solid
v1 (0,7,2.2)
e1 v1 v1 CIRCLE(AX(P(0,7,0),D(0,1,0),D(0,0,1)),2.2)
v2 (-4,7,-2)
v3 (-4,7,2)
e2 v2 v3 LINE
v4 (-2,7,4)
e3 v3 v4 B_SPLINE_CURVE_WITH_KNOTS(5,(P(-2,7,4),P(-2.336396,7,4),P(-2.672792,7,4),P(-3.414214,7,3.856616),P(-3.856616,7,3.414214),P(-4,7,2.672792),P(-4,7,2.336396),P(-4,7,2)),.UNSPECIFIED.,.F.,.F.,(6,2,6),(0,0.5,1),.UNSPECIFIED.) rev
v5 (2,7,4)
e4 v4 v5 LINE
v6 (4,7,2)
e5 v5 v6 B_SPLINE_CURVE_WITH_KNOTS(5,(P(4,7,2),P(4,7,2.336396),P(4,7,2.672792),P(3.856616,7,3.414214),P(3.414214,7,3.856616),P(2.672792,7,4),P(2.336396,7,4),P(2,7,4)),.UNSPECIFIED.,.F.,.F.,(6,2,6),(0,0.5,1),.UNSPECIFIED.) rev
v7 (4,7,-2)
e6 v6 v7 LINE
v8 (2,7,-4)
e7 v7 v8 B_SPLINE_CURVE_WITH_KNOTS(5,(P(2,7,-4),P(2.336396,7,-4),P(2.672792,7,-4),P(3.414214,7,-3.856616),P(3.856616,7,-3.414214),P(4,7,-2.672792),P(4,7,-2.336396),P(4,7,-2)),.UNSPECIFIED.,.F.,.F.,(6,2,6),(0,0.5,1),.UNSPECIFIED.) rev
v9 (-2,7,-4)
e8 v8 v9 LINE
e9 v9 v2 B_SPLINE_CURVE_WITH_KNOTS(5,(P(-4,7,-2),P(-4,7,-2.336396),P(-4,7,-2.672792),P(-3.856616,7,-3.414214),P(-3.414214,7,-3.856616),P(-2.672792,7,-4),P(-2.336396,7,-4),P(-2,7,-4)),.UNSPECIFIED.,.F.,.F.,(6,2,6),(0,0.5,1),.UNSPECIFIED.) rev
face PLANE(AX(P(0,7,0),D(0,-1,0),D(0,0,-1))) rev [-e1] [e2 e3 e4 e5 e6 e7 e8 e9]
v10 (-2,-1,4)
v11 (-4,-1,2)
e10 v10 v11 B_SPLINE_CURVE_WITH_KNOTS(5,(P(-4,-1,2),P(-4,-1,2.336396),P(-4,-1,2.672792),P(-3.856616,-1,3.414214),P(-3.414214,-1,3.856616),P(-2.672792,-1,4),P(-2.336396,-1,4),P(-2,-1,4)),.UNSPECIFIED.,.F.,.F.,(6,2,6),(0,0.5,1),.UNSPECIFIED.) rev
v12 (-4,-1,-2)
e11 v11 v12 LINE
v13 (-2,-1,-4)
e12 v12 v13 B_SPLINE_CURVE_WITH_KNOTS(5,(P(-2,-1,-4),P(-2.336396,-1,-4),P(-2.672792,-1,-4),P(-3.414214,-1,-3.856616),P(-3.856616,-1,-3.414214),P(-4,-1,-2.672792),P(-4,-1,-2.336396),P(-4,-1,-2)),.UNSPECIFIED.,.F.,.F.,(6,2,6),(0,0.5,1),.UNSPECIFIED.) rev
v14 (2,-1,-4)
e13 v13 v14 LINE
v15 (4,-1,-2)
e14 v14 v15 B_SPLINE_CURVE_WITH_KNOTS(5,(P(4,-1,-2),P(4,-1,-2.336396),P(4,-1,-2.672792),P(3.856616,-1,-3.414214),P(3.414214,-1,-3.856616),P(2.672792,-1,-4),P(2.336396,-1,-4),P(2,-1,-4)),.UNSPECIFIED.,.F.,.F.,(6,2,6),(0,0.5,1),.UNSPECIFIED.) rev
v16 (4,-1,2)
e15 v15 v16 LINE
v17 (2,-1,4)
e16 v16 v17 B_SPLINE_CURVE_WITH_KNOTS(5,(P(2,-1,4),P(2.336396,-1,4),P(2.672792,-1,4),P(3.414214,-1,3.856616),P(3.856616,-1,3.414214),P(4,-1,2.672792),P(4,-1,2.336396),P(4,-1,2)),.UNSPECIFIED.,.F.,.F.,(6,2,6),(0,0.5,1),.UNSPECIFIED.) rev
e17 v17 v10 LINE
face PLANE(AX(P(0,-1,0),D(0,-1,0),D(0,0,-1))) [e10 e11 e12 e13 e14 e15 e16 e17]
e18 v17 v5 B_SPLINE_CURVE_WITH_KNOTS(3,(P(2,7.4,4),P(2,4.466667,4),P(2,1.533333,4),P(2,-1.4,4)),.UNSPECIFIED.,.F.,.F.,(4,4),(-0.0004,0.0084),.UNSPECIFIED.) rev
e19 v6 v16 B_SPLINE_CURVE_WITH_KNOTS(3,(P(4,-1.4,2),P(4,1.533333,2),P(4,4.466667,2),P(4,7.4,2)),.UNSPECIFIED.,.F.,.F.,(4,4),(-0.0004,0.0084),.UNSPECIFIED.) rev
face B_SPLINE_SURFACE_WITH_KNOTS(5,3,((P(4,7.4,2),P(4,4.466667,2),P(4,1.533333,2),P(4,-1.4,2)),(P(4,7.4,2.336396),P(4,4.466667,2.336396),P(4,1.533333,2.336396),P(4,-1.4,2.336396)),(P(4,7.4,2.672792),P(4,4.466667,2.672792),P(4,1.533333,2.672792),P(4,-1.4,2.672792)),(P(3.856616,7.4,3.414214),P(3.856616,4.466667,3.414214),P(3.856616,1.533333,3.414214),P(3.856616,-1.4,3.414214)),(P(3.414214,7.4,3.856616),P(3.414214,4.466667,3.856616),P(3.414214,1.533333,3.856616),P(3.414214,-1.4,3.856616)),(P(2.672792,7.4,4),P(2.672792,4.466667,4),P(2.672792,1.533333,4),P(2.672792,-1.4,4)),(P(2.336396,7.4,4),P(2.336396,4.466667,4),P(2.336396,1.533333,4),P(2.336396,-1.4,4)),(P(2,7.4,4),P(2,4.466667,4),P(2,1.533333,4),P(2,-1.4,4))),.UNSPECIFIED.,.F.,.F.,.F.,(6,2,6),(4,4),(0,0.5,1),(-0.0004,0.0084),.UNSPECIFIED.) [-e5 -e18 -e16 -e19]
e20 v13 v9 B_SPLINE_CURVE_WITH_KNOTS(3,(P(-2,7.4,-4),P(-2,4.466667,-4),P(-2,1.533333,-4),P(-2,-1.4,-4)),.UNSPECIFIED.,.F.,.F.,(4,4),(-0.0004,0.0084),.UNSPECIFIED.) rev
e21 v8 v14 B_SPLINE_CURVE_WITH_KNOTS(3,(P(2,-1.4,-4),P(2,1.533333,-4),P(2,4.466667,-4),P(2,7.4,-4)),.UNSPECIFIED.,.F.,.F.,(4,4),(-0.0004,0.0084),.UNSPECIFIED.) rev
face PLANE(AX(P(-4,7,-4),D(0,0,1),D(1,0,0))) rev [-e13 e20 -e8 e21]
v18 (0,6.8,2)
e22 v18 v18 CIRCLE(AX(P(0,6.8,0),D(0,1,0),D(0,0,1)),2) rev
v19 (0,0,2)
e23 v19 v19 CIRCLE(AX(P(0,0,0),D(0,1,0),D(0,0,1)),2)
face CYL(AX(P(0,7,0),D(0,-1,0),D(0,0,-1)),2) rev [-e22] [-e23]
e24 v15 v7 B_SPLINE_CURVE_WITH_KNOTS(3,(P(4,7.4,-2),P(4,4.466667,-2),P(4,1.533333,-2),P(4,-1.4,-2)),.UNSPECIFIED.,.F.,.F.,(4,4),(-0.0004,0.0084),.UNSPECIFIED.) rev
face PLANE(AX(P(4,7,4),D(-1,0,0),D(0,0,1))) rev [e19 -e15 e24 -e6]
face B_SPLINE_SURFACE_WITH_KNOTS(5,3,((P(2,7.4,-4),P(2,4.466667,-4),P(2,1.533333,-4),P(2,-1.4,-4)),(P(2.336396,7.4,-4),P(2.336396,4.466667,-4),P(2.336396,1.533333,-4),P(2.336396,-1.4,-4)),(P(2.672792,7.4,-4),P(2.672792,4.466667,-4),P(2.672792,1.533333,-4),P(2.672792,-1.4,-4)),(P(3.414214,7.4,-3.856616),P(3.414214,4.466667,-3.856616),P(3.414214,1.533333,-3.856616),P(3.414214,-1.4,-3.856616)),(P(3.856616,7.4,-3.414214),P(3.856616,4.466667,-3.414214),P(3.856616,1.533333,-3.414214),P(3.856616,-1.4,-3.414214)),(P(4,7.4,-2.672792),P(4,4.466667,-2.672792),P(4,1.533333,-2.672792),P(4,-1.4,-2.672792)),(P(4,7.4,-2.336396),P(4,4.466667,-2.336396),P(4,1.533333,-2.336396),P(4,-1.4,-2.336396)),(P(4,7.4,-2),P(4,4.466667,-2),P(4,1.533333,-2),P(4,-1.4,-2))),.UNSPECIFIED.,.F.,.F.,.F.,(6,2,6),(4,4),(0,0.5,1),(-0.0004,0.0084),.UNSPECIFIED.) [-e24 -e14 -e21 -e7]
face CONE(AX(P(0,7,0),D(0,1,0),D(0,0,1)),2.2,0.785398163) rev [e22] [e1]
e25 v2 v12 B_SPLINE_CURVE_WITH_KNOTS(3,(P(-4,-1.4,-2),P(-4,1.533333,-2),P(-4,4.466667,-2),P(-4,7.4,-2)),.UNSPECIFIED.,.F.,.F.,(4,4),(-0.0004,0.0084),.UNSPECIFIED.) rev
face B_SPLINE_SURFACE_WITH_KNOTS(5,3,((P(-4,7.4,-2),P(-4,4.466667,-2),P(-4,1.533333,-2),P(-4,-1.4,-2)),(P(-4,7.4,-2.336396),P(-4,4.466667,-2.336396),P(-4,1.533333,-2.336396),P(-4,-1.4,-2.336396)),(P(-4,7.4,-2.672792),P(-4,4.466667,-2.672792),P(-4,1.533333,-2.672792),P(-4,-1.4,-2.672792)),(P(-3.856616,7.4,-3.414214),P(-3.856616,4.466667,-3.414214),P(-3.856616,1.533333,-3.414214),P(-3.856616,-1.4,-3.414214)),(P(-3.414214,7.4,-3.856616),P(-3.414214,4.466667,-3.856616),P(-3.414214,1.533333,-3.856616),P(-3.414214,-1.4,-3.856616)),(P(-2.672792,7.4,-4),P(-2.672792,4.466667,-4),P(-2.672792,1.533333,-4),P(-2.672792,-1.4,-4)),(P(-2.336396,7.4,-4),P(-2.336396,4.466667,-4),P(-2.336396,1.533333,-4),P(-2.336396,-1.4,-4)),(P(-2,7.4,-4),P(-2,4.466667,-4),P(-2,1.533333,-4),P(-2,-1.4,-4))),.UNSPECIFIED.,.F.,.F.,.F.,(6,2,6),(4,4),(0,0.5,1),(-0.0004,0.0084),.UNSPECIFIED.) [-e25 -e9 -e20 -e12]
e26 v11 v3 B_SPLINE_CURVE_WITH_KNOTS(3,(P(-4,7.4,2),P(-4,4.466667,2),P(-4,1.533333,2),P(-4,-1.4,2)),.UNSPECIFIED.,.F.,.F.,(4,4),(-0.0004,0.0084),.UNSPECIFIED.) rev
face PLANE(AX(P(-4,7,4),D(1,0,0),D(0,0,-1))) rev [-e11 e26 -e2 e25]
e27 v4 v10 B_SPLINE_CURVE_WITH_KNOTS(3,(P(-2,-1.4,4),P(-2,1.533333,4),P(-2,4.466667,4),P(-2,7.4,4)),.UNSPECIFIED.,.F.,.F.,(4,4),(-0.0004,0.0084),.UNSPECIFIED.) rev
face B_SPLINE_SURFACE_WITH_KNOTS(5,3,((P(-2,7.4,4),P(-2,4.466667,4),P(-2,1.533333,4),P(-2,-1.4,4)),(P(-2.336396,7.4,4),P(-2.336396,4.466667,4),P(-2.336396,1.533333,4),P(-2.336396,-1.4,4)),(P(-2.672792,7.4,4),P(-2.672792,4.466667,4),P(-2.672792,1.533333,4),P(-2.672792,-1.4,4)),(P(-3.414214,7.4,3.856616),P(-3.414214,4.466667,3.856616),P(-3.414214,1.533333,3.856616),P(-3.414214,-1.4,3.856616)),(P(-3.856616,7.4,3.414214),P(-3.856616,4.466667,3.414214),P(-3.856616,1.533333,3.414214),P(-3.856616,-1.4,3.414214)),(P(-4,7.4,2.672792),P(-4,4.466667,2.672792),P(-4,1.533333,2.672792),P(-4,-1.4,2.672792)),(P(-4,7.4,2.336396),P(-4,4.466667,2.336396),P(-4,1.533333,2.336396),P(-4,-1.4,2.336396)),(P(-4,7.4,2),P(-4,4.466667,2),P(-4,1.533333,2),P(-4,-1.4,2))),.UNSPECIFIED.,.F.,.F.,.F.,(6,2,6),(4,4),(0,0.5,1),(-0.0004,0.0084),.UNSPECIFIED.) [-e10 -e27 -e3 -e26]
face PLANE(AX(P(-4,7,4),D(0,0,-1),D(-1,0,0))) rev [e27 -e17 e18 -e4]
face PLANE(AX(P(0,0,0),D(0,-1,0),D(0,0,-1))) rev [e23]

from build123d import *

# Parameters (mm, degrees)
SKETCH2_W                                       = 8
SKETCH2_H                                       = 8
SKETCH2_R                                       = 2
BOSS_EXTRUDE1_DEPTH                             = 7
SKETCH3_W                                       = 8
SKETCH3_H                                       = 8
BOSS_EXTRUDE2_DEPTH                             = 1
FILLET1_SIZE                                    = 2
CSK_FOR_M2_FLAT_HEAD_MACHINE_SCREW1_D           = 2.4
CSK_FOR_M2_FLAT_HEAD_MACHINE_SCREW1_DEPTH       = 7
CSK_FOR_M2_FLAT_HEAD_MACHINE_SCREW1_CSINK_D     = 4.4
CSK_FOR_M2_FLAT_HEAD_MACHINE_SCREW1_CSINK_ANGLE = 90


with BuildPart() as part:
    # Sketch2 → Boss-Extrude1 (new body)
    with BuildSketch(Plane(origin=(0, 0, 0), x_dir=(1, 0, 0), z_dir=(0, 1, 0))):
        Rectangle(SKETCH2_W, SKETCH2_H)
        with Locations(Location((0, 0, 0), (0, 0, 270))):
            Circle(SKETCH2_R, mode=Mode.SUBTRACT)
    extrude(amount=BOSS_EXTRUDE1_DEPTH)

    # Sketch3 → Boss-Extrude2 (add)
    with BuildSketch(Plane.XZ):
        Rectangle(SKETCH3_W, SKETCH3_H)
    extrude(amount=BOSS_EXTRUDE2_DEPTH)

    # Fillet1
    # a fillet whose section is not a circle: 2 mm, written as the material it takes off along each edge
    with BuildSketch(Plane(origin=(4, -6, 4), x_dir=(-1, 0, 0), z_dir=(0, 1, 0)), Plane(origin=(-4, 12, 4), x_dir=(1, 0, 0), z_dir=(0, -1, 0))) as fillet1_piece_1:
        with BuildLine():
            add(Edge.make_bspline([(FILLET1_SIZE, 0), (FILLET1_SIZE * 0.831801948466, 0), (FILLET1_SIZE * 0.663603896932, 0), (FILLET1_SIZE * 0.292893218813, -FILLET1_SIZE * 0.0716919198361), (FILLET1_SIZE * 0.0716919198361, -FILLET1_SIZE * 0.292893218813), (0, -FILLET1_SIZE * 0.663603896932), (0, -FILLET1_SIZE * 0.831801948466), (0, -FILLET1_SIZE)], knots=[0, 0, 0, 0, 0, 0, 0.5, 0.5, 1, 1, 1, 1, 1, 1], degree=5))
            Line((0, -FILLET1_SIZE), (0, 0))
            Line((0, 0), (FILLET1_SIZE, 0))
        make_face()
    extrude(amount=18, mode=Mode.SUBTRACT)
    with BuildSketch(Plane(origin=(-4, 12, -4), x_dir=(1, 0, 0), z_dir=(0, -1, 0)), Plane(origin=(4, -6, -4), x_dir=(-1, 0, 0), z_dir=(0, 1, 0))) as fillet1_piece_2:
        with BuildLine():
            add(Edge.make_bspline([(FILLET1_SIZE, 0), (FILLET1_SIZE * 0.831801948466, 0), (FILLET1_SIZE * 0.663603896932, 0), (FILLET1_SIZE * 0.292893218813, FILLET1_SIZE * 0.0716919198361), (FILLET1_SIZE * 0.0716919198361, FILLET1_SIZE * 0.292893218813), (0, FILLET1_SIZE * 0.663603896932), (0, FILLET1_SIZE * 0.831801948466), (0, FILLET1_SIZE)], knots=[0, 0, 0, 0, 0, 0, 0.5, 0.5, 1, 1, 1, 1, 1, 1], degree=5))
            Line((0, FILLET1_SIZE), (0, 0))
            Line((0, 0), (FILLET1_SIZE, 0))
        make_face()
    extrude(amount=18, mode=Mode.SUBTRACT)

    # CSK for M2 Flat Head Machine Screw1
    with Locations(Plane(origin=(0, 7, 0), x_dir=(1, 0, 0), z_dir=(0, 1, 0))):
        with Locations((0, 0)):
            CounterSinkHole(CSK_FOR_M2_FLAT_HEAD_MACHINE_SCREW1_D / 2, CSK_FOR_M2_FLAT_HEAD_MACHINE_SCREW1_CSINK_D / 2, depth=CSK_FOR_M2_FLAT_HEAD_MACHINE_SCREW1_DEPTH, counter_sink_angle=CSK_FOR_M2_FLAT_HEAD_MACHINE_SCREW1_CSINK_ANGLE)


solid = part.part
